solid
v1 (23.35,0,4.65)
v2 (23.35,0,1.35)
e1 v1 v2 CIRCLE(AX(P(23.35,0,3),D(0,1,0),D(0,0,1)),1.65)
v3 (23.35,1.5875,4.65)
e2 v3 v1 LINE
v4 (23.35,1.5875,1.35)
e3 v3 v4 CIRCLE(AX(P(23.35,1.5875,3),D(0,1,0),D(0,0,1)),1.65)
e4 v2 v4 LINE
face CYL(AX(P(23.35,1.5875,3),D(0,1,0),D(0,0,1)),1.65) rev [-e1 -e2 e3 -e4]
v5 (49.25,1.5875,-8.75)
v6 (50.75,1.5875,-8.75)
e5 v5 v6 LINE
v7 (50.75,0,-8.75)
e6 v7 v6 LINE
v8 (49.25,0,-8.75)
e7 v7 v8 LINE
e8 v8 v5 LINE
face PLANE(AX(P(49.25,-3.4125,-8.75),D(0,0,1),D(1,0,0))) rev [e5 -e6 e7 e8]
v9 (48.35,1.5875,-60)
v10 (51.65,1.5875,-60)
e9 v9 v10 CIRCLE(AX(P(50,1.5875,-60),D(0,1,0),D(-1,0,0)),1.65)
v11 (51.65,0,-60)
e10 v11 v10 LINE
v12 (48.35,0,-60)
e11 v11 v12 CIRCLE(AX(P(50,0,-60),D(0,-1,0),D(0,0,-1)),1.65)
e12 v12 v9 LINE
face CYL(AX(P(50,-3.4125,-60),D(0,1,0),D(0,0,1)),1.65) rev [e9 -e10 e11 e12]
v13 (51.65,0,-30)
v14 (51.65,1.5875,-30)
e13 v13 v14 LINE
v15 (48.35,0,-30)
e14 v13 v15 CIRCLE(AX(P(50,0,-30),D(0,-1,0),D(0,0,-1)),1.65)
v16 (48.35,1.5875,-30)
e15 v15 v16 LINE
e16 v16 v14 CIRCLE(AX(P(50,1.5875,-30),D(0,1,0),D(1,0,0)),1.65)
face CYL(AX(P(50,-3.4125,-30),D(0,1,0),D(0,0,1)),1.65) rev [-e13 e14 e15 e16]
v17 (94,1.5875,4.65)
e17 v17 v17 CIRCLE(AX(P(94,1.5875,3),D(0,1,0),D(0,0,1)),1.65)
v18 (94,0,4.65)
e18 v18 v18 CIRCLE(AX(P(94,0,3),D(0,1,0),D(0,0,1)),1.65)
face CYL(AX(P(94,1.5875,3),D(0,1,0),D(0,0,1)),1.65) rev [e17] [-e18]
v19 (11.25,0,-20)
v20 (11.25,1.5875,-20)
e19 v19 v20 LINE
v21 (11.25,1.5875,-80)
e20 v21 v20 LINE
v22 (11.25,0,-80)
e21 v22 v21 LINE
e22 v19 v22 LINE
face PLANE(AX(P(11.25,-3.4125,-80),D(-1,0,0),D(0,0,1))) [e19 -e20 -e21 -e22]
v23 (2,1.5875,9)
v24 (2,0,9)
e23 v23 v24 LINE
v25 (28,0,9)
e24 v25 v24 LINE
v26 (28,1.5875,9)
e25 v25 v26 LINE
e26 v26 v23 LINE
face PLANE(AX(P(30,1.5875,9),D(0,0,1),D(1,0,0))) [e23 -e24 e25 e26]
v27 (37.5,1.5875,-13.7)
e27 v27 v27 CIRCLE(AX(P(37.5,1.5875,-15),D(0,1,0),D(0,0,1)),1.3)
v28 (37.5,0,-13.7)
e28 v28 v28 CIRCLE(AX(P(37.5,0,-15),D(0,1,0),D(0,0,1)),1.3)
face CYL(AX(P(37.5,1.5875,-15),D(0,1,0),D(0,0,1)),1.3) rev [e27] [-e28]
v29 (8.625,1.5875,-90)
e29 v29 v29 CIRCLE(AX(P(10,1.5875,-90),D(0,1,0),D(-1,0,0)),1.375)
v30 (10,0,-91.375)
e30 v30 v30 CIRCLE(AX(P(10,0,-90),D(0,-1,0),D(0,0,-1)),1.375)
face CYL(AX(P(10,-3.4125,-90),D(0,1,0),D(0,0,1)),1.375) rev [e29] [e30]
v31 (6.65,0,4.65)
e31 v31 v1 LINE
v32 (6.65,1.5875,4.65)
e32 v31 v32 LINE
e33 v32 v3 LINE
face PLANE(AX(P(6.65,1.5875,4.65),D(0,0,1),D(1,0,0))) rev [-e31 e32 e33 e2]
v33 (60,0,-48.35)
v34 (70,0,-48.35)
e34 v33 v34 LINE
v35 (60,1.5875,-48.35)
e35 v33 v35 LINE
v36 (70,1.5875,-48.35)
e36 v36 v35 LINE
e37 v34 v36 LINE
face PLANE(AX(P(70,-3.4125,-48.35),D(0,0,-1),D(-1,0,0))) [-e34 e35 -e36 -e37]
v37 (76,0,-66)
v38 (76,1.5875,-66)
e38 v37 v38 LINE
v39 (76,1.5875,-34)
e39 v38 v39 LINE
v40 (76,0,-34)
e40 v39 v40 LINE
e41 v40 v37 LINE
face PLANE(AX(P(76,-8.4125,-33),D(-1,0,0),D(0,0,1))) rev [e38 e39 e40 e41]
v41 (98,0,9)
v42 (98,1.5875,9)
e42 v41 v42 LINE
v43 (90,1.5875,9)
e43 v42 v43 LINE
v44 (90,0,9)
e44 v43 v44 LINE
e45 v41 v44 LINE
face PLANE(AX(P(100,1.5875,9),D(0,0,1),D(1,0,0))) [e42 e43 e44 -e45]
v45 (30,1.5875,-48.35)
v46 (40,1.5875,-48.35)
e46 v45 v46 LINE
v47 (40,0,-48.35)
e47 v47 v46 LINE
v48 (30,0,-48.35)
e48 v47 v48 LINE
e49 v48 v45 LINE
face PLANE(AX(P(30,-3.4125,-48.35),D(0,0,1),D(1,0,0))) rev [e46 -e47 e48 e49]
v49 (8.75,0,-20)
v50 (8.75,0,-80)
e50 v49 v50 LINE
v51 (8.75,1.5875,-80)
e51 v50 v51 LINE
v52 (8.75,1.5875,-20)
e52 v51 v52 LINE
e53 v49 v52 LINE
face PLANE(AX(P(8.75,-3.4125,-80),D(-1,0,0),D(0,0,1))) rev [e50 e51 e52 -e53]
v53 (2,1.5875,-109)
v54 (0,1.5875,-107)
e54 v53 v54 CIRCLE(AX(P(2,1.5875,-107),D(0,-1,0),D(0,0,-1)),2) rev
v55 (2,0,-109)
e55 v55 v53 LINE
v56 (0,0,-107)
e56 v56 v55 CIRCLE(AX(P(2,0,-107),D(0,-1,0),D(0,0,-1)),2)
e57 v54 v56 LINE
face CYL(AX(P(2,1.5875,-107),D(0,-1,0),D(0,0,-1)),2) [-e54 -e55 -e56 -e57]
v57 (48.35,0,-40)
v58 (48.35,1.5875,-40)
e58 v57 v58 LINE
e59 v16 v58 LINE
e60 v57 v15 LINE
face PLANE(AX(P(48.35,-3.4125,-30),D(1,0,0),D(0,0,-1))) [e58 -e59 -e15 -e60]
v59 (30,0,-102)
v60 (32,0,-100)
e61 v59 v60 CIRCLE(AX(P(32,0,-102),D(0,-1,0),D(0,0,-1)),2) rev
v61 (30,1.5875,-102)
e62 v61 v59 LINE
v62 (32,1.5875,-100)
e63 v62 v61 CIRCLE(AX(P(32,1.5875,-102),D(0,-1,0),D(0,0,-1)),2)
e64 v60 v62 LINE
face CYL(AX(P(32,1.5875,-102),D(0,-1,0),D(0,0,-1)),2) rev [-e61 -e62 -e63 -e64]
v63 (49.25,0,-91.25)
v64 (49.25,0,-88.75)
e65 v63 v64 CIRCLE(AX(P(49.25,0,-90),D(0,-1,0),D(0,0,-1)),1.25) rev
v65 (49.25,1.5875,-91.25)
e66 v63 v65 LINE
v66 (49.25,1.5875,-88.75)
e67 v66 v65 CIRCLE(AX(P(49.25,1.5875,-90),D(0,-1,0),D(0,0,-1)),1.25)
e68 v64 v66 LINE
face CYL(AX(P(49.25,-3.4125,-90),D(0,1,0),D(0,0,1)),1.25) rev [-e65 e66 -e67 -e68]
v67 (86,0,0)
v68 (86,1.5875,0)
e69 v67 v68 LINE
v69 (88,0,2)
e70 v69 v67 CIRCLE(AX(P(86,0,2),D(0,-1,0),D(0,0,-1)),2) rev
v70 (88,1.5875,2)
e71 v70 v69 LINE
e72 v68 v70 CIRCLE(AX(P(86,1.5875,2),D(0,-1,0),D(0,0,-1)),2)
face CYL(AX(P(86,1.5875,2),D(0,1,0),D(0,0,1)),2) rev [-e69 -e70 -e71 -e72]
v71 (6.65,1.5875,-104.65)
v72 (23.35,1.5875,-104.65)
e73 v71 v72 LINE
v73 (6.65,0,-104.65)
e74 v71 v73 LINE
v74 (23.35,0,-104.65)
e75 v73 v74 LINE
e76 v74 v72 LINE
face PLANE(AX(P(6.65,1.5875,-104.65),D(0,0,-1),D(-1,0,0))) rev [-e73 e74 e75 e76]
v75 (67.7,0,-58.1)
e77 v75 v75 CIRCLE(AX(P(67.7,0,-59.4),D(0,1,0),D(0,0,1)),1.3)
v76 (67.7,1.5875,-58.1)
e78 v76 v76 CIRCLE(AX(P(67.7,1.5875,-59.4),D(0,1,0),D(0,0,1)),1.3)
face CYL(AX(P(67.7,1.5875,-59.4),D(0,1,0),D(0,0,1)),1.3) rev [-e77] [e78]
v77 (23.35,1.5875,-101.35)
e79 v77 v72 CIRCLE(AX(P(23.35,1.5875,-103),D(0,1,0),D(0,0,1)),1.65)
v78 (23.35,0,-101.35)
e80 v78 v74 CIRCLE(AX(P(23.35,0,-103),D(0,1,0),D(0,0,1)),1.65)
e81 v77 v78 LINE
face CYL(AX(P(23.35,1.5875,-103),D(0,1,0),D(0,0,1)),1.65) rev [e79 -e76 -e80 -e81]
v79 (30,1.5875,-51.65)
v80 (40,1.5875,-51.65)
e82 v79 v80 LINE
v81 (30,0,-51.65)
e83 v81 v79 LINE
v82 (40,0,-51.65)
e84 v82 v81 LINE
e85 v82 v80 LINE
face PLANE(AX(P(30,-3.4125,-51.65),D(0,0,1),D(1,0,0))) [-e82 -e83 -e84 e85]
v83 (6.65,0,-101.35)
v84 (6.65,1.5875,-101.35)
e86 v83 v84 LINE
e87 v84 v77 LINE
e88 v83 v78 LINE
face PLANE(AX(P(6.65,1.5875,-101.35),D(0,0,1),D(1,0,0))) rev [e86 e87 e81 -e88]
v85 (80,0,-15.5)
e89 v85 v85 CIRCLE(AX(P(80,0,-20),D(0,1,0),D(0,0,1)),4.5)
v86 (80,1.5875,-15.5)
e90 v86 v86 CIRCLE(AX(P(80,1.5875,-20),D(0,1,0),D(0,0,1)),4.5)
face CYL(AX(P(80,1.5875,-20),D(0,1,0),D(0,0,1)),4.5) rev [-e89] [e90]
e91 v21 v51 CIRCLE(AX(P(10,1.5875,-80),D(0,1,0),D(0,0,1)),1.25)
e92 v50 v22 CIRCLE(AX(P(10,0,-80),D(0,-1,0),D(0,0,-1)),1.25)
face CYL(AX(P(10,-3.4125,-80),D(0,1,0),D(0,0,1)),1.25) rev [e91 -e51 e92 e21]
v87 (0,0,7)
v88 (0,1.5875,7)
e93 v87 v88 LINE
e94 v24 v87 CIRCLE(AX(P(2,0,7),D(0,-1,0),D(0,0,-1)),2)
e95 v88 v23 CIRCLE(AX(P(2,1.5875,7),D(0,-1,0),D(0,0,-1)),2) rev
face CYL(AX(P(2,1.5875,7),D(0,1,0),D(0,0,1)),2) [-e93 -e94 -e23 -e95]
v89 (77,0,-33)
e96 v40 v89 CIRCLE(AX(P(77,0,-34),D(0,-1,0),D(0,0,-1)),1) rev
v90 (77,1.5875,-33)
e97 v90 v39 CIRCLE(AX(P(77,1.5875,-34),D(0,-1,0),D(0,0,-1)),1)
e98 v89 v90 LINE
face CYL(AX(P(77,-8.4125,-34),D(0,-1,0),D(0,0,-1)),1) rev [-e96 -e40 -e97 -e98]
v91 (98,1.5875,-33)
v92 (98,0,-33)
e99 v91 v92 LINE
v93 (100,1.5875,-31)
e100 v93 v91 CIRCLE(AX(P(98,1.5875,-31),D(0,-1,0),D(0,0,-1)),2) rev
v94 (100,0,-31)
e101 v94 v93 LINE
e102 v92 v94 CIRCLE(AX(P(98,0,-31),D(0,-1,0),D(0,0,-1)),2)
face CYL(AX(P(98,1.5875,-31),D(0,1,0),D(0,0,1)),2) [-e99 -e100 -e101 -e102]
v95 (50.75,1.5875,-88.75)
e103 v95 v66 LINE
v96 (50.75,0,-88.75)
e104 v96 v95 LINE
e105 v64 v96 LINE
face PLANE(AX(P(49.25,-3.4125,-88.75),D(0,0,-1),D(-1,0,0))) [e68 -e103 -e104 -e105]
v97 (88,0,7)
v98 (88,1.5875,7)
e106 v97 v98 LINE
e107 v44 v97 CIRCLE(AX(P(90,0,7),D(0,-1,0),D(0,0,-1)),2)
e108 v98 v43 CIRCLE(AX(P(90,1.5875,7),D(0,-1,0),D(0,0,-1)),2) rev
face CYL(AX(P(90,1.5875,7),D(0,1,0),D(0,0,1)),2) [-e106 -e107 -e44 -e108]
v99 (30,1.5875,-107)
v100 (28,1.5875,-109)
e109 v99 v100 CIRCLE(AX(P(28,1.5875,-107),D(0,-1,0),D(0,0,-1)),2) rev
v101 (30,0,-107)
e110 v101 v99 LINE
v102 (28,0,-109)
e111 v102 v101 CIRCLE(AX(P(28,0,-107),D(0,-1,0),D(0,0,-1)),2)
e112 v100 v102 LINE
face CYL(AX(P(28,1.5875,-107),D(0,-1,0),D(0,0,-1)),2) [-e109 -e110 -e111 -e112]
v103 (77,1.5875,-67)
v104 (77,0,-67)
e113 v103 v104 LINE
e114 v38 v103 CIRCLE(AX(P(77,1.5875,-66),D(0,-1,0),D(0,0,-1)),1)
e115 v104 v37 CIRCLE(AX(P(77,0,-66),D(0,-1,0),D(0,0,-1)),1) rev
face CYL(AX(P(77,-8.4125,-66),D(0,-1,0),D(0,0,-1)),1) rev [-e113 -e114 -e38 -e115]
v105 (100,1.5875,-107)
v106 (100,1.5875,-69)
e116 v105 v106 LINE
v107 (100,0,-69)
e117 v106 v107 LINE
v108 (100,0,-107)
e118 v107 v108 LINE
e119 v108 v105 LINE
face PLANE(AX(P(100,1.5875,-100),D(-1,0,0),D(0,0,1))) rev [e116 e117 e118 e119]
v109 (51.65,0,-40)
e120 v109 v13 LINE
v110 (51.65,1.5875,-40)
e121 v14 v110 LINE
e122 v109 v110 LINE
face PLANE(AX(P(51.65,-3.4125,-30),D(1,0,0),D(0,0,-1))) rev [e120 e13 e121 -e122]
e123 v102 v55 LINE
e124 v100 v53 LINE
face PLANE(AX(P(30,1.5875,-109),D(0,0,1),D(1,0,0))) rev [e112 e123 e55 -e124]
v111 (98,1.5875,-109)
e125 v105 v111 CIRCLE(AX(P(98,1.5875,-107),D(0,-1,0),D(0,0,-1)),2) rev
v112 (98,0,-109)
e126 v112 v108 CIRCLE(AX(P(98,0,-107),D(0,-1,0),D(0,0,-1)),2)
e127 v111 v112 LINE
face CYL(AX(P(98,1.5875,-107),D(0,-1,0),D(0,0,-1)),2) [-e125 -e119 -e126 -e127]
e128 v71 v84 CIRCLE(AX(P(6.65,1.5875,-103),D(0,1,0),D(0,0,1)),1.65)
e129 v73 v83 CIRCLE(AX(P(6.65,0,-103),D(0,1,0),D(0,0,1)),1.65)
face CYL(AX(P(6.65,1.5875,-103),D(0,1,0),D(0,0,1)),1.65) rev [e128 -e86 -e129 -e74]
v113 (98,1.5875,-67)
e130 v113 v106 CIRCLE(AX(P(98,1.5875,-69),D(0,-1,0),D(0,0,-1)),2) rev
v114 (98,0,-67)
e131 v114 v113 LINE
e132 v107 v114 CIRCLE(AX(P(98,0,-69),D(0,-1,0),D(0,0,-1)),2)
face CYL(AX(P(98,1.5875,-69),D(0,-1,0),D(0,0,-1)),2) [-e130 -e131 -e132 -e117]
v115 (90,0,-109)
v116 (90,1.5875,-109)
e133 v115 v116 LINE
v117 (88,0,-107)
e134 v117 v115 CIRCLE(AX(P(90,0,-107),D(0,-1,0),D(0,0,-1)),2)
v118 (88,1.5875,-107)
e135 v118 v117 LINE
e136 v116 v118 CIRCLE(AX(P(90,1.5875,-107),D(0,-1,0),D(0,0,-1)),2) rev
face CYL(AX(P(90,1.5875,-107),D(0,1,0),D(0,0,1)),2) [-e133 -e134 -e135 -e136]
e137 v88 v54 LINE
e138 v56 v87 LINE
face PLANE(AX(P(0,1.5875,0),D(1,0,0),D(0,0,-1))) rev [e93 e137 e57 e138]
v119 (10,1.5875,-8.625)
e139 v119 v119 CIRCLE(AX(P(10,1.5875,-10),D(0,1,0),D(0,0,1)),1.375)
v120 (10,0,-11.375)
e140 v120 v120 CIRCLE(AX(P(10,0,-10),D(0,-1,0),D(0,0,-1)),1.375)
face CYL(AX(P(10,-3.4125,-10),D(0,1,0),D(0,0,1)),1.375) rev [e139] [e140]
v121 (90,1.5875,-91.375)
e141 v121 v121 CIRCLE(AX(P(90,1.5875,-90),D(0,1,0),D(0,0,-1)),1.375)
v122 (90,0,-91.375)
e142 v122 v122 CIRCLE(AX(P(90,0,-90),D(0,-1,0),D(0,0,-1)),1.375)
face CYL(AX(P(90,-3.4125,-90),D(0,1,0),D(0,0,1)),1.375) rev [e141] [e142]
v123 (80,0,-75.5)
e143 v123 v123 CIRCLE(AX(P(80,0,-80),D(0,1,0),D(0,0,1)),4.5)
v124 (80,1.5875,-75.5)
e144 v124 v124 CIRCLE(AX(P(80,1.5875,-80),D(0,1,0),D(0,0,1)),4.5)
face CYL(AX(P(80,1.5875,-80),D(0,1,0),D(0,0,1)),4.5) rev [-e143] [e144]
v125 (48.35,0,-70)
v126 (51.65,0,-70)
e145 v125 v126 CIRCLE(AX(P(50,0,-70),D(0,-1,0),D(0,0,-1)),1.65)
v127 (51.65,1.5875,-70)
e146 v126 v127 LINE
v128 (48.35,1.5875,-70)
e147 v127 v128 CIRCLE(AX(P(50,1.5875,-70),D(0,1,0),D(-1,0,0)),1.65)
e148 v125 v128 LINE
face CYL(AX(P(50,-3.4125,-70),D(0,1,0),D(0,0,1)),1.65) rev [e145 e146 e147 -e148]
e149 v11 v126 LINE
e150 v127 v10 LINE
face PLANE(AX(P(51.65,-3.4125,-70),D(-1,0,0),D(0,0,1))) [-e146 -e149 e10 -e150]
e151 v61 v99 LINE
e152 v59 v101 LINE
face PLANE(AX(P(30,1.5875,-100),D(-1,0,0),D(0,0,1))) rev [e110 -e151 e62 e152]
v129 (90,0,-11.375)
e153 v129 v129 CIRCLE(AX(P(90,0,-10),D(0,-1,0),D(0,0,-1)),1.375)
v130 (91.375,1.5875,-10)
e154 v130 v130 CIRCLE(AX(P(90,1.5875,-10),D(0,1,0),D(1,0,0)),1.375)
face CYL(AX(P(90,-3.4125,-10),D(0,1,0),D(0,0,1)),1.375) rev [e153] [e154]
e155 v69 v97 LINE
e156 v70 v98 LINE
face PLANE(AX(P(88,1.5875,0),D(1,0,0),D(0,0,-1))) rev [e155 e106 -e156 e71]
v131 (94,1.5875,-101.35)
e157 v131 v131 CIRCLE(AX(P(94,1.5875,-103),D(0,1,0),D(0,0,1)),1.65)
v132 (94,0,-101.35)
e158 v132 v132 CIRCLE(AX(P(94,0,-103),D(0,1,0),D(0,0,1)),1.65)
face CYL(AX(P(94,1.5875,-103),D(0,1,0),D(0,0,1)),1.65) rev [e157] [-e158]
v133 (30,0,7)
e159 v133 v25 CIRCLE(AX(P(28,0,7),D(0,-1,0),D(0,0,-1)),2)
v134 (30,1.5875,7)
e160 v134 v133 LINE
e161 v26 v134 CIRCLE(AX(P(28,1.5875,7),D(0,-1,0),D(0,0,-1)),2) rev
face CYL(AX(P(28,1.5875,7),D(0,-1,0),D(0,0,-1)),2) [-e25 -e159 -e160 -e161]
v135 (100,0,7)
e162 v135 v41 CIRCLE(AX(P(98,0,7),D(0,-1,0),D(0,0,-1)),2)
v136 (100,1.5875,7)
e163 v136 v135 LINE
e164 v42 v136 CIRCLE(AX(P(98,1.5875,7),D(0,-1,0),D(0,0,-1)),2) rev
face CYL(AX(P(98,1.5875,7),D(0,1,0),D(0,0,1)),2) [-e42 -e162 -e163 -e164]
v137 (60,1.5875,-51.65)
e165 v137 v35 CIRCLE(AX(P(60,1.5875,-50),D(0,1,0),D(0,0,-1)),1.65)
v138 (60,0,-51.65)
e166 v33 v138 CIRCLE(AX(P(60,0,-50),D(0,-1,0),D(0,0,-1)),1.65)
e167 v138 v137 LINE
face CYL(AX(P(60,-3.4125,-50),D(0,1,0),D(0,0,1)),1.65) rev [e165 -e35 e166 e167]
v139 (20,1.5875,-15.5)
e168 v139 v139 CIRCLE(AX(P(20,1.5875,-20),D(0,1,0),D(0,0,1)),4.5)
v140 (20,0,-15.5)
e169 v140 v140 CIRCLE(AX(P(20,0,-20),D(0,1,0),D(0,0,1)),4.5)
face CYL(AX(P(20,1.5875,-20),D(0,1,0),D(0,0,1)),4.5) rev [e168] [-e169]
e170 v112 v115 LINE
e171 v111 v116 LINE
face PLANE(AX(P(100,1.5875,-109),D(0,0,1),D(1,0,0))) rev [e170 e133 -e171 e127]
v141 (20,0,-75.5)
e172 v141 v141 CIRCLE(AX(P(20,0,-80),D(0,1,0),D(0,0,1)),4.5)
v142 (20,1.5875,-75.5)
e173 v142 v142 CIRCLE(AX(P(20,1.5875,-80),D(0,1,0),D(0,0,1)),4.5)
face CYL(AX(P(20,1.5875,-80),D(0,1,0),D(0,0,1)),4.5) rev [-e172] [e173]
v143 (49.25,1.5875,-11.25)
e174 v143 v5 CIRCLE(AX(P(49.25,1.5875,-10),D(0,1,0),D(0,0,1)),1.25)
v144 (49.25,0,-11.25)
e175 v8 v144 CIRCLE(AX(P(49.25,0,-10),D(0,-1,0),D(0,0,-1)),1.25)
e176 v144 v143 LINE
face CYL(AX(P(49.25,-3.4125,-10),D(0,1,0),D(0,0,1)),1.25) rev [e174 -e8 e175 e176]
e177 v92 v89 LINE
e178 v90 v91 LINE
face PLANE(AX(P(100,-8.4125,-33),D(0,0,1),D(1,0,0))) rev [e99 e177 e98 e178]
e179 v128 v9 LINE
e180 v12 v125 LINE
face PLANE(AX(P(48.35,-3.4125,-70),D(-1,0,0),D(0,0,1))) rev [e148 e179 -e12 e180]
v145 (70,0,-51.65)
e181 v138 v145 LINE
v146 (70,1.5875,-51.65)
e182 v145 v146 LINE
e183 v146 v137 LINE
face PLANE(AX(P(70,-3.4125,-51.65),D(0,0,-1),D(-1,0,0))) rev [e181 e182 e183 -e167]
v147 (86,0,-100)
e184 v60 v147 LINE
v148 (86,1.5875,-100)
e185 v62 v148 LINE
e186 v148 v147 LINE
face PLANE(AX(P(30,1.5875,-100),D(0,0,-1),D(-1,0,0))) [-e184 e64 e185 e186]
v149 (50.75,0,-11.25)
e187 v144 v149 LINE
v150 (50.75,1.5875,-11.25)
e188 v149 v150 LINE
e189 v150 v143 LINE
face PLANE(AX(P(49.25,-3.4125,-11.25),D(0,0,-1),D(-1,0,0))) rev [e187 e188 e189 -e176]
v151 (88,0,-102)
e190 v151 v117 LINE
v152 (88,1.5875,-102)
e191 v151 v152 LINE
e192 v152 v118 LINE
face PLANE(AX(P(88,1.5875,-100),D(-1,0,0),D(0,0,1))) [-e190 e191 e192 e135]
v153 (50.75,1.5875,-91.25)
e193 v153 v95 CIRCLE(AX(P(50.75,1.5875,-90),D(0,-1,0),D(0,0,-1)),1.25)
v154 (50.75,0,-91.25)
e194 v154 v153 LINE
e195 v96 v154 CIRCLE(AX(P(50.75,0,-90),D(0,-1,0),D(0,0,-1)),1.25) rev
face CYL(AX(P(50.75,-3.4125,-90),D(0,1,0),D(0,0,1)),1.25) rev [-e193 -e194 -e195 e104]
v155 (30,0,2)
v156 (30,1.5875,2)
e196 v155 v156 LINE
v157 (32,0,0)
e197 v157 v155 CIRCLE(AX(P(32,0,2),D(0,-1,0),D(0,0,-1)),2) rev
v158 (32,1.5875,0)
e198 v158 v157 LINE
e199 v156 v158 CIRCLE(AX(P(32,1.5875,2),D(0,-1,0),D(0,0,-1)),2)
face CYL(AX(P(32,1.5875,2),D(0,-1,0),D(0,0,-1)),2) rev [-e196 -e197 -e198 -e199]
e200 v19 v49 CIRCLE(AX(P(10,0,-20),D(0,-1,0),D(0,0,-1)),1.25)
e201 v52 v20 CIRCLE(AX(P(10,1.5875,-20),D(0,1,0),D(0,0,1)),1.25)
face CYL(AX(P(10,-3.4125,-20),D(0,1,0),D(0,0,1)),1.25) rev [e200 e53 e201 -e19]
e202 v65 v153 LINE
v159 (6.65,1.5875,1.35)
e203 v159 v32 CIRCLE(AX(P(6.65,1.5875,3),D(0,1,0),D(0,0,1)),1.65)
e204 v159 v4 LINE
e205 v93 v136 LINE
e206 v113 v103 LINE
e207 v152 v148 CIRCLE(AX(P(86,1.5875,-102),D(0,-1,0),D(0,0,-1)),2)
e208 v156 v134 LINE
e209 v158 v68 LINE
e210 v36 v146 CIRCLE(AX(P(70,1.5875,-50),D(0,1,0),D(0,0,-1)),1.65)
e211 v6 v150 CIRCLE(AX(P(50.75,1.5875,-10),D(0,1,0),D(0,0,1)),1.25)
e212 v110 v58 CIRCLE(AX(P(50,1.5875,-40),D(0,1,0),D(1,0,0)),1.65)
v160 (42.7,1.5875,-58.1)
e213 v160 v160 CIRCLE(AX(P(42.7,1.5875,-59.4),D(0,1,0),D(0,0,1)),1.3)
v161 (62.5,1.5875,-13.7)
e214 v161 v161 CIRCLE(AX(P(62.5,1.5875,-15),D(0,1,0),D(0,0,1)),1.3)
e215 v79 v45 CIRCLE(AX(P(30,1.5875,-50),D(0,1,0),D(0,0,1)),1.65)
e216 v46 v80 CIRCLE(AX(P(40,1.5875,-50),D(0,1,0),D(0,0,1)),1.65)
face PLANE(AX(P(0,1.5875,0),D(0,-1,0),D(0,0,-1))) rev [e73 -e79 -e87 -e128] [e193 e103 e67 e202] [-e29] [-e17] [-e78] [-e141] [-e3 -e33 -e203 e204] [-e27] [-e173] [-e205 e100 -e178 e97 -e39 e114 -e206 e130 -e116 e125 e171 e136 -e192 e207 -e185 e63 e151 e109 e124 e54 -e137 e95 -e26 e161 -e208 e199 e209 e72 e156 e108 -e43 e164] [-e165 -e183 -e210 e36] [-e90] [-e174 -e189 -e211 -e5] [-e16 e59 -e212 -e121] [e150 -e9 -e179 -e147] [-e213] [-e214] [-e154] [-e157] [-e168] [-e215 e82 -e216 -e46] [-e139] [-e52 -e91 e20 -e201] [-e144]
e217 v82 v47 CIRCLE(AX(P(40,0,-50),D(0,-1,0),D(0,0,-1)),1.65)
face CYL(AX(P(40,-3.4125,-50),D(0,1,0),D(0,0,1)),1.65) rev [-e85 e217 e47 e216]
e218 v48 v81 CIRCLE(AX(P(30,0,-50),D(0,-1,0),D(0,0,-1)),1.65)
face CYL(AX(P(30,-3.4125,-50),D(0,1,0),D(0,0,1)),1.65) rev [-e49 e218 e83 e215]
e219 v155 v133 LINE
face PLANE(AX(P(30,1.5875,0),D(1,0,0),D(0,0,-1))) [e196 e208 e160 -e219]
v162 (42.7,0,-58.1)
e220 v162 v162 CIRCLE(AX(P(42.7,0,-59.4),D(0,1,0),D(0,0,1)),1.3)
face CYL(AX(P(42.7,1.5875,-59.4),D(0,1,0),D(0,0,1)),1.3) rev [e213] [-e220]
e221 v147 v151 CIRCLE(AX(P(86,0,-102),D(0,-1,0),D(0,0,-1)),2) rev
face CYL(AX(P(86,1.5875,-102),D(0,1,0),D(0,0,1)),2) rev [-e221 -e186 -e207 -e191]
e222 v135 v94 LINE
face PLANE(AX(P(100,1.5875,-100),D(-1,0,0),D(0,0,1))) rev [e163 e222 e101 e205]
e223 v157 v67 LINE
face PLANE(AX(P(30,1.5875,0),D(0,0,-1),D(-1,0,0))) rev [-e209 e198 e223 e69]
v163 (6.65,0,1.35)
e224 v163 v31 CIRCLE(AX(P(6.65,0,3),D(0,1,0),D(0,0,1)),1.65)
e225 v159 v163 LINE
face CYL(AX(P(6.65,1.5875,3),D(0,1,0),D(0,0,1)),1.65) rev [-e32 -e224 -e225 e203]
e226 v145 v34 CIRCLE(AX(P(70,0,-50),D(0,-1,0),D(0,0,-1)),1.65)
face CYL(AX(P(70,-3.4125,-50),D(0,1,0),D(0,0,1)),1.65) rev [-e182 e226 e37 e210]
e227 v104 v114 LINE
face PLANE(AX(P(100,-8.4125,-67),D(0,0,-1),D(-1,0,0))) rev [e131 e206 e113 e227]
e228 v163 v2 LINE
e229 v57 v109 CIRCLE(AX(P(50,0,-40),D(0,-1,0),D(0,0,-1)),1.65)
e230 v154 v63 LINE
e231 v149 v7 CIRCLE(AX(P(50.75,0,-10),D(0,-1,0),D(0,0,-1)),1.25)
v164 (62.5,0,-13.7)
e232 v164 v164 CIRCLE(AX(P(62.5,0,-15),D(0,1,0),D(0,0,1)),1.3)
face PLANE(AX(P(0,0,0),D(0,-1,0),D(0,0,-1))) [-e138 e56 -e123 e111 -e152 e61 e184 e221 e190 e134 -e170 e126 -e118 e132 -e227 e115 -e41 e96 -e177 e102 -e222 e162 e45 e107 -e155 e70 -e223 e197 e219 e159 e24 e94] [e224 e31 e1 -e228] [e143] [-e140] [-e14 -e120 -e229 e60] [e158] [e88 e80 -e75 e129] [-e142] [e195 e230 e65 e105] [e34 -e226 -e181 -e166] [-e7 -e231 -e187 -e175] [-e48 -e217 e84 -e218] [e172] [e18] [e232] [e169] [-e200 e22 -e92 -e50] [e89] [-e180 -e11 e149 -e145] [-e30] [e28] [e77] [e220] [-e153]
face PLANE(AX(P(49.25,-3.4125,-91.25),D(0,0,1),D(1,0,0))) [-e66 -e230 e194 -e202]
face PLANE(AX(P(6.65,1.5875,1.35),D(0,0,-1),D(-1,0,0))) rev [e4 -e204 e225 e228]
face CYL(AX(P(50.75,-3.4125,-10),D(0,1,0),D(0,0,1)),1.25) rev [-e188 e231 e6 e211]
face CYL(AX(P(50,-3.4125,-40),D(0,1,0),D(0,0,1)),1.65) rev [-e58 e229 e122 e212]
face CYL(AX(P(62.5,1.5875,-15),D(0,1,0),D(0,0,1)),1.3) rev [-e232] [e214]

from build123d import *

# Parameters (mm, degrees)
BOSS_EXTRUDE1_DEPTH       = 1.5875
CUT_EXTRUDE1_DEPTH        = 5
SKETCH4_R                 = 1.375
CUT_EXTRUDE2_DEPTH        = 5
CUT_EXTRUDE4_DEPTH        = 5
CUT_EXTRUDE6_DEPTH        = 5
CIRPATTERN1_COUNT         = 4
CIRPATTERN4_COUNT         = 4
F_2_5MM_DOWEL_HOLE1_D     = 2.6
F_2_5MM_DOWEL_HOLE2_D     = 2.6
F_9_0_9_DIAMETER_HOLE1_D  = 9
CIRPATTERN5_COUNT         = 4
FILLET1_R                 = 2
F_2_5MM_DOWEL_HOLE3_D     = 3.3
F_2_5MM_DOWEL_SLOT1_DEPTH = 1.5875
SKETCH19_W                = 24
SKETCH19_H                = 34
CUT_EXTRUDE7_DEPTH        = 10
FILLET2_R                 = 2
FILLET3_R                 = 1


# Read off the part's stored shape, not the designer's step: Ø2.5mm Dowel Slot1
with BuildPart() as part:
    # Sketch2 → Boss-Extrude1 (new body)
    with BuildSketch(Plane(origin=(0, 0, 0), x_dir=(1, 0, 0), z_dir=(0, 1, 0))):
        Polygon((30, 0), (88, 0), (88, -9), (100, -9), (100, 0), (100, 100), (100, 109), (88, 109), (88, 100), (30, 100), (30, 109), (0, 109), (0, 100), (0, 0), (0, -9), (30, -9), align=None)
    extrude(amount=BOSS_EXTRUDE1_DEPTH)

    # Sketch3 → Cut-Extrude1 (cut)
    with BuildSketch(Plane(origin=(0, 1.5875, 0), x_dir=(1, 0, 0), z_dir=(0, 1, 0))):
        with BuildLine():
            Line((11.25, 80), (11.25, 20))
            ThreePointArc((11.25, 20), (10, 18.75), (8.75, 20))
            Line((8.75, 20), (8.75, 80))
            ThreePointArc((8.75, 80), (10, 81.25), (11.25, 80))
        make_face()
    extrude(amount=-CUT_EXTRUDE1_DEPTH, mode=Mode.SUBTRACT)

    # Sketch4 → Cut-Extrude2 (cut)
    with BuildSketch(Plane(origin=(0, 1.5875, 0), x_dir=(1, 0, 0), z_dir=(0, 1, 0))):
        with Locations(Location((10, 10, 0), (0, 0, 270))):
            Circle(SKETCH4_R)
    cut_extrude2 = extrude(amount=-CUT_EXTRUDE2_DEPTH, mode=Mode.SUBTRACT)

    # Sketch6 → Cut-Extrude4 (cut)
    with BuildSketch(Plane(origin=(0, 1.5875, 0), x_dir=(1, 0, 0), z_dir=(0, 1, 0))):
        with BuildLine():
            Line((49.25, 11.25), (50.75, 11.25))
            ThreePointArc((50.75, 11.25), (52, 10), (50.75, 8.75))
            Line((50.75, 8.75), (49.25, 8.75))
            ThreePointArc((49.25, 8.75), (48, 10), (49.25, 11.25))
        make_face()
    cut_extrude4 = extrude(amount=-CUT_EXTRUDE4_DEPTH, mode=Mode.SUBTRACT)

    # Sketch8 → Cut-Extrude6 (cut)
    with BuildSketch(Plane(origin=(0, 1.5875, 0), x_dir=(1, 0, 0), z_dir=(0, 1, 0))):
        with BuildLine():
            Line((30, 51.65), (40, 51.65))
            ThreePointArc((40, 51.65), (41.65, 50), (40, 48.35))
            Line((40, 48.35), (30, 48.35))
            ThreePointArc((30, 48.35), (28.35, 50), (30, 51.65))
        make_face()
    cut_extrude6 = extrude(amount=-CUT_EXTRUDE6_DEPTH, mode=Mode.SUBTRACT)

    # CirPattern1: Cut-Extrude6 ×4 about axis
    cirpattern1_axis = Axis((50, 0, -50), (0, 1, 0))
    for i in range(1, CIRPATTERN1_COUNT):
        add(cut_extrude6.rotate(cirpattern1_axis, i * 360 / CIRPATTERN1_COUNT), mode=Mode.SUBTRACT)

    # CirPattern4: Cut-Extrude2 ×4 about axis
    cirpattern4_axis = Axis((50, 0, -50), (0, 1, 0))
    for i in range(1, CIRPATTERN4_COUNT):
        add(cut_extrude2.rotate(cirpattern4_axis, i * 360 / CIRPATTERN4_COUNT), mode=Mode.SUBTRACT)

    # Mirror6: Cut-Extrude4 across plane
    add(cut_extrude4.mirror(Plane(origin=(0, 0, -50), x_dir=(1, 0, 0), z_dir=(0, 0, -1))), mode=Mode.SUBTRACT)

    # Ø2.5mm Dowel Hole1 (through all)
    with Locations(Plane(origin=(0, 1.5875, 0), x_dir=(1, 0, 0), z_dir=(0, 1, 0))):
        with Locations((62.5, 15), (37.5, 15)):
            Hole(F_2_5MM_DOWEL_HOLE1_D / 2)

    # Ø2.5mm Dowel Hole2 (through all)
    with Locations(Plane(origin=(0, 1.5875, 0), x_dir=(1, 0, 0), z_dir=(0, 1, 0))):
        with Locations((42.7, 59.4), (67.7, 59.4)):
            Hole(F_2_5MM_DOWEL_HOLE2_D / 2)

    # Ø9.0 (9) Diameter Hole1 (through all)
    with Locations(Plane(origin=(0, 1.5875, 0), x_dir=(1, 0, 0), z_dir=(0, 1, 0))):
        with Locations((80, 20)):
            f_9_0_9_diameter_hole1 = Hole(F_9_0_9_DIAMETER_HOLE1_D / 2)

    # CirPattern5: Ø9.0 (9) Diameter Hole1 ×4 about axis
    cirpattern5_axis = Axis((50, 0, -50), (0, 1, 0))
    for i in range(1, CIRPATTERN5_COUNT):
        add(f_9_0_9_diameter_hole1.rotate(cirpattern5_axis, i * 360 / CIRPATTERN5_COUNT), mode=Mode.SUBTRACT)

    # Fillet1
    fillet1_edges = [part.edges().sort_by_distance(p)[0] for p in [
        (30, 0.79375, 0),
        (30, 0.79375, 9),
        (0, 0.79375, 9),
        (0, 0.79375, -109),
        (30, 0.79375, -109),
        (30, 0.79375, -100),
        (88, 0.79375, -100),
        (88, 0.79375, -109),
        (100, 0.79375, -109),
        (100, 0.79375, 9),
        (88, 0.79375, 9),
        (88, 0.79375, 0),
    ]]
    fillet(fillet1_edges, radius=FILLET1_R)

    # Ø2.5mm Dowel Hole3 (through all)
    with Locations(Plane(origin=(0, 1.5875, 0), x_dir=(1, 0, 0), z_dir=(0, 1, 0))):
        with Locations((94, -3), (94, 103)):
            Hole(F_2_5MM_DOWEL_HOLE3_D / 2)

    # Ø2.5mm Dowel Slot1 outline → Ø2.5mm Dowel Slot1 (cut)
    with BuildSketch(Plane(origin=(0, 0, 0), x_dir=(1, 0, 0), z_dir=(0, 1, 0))):
        with BuildLine():
            Line((6.65, 101.35), (23.35, 101.35))
            ThreePointArc((23.35, 101.35), (25, 103), (23.35, 104.65))
            Line((23.35, 104.65), (6.65, 104.65))
            ThreePointArc((6.65, 104.65), (5, 103), (6.65, 101.35))
        make_face()
        with BuildLine():
            Line((6.65, -4.65), (23.35, -4.65))
            ThreePointArc((23.35, -4.65), (25, -3), (23.35, -1.35))
            Line((23.35, -1.35), (6.65, -1.35))
            ThreePointArc((6.65, -1.35), (5, -3), (6.65, -4.65))
        make_face()
    extrude(amount=F_2_5MM_DOWEL_SLOT1_DEPTH, mode=Mode.SUBTRACT)

    # Sketch19 → Cut-Extrude7 (cut)
    with BuildSketch(Plane(origin=(0, 1.5875, 0), x_dir=(1, 0, 0), z_dir=(0, 1, 0))):
        with Locations((88, 50)):
            Rectangle(SKETCH19_W, SKETCH19_H)
    extrude(amount=-CUT_EXTRUDE7_DEPTH, mode=Mode.SUBTRACT)

    # Fillet2
    fillet2_edges = [part.edges().sort_by_distance(p)[0] for p in [
        (100, 0.79375, -67),
        (100, 0.79375, -33),
    ]]
    fillet(fillet2_edges, radius=FILLET2_R)

    # Fillet3
    fillet3_edges = [part.edges().sort_by_distance(p)[0] for p in [
        (76, 0.79375, -33),
        (76, 0.79375, -67),
    ]]
    fillet(fillet3_edges, radius=FILLET3_R)


solid = part.part
